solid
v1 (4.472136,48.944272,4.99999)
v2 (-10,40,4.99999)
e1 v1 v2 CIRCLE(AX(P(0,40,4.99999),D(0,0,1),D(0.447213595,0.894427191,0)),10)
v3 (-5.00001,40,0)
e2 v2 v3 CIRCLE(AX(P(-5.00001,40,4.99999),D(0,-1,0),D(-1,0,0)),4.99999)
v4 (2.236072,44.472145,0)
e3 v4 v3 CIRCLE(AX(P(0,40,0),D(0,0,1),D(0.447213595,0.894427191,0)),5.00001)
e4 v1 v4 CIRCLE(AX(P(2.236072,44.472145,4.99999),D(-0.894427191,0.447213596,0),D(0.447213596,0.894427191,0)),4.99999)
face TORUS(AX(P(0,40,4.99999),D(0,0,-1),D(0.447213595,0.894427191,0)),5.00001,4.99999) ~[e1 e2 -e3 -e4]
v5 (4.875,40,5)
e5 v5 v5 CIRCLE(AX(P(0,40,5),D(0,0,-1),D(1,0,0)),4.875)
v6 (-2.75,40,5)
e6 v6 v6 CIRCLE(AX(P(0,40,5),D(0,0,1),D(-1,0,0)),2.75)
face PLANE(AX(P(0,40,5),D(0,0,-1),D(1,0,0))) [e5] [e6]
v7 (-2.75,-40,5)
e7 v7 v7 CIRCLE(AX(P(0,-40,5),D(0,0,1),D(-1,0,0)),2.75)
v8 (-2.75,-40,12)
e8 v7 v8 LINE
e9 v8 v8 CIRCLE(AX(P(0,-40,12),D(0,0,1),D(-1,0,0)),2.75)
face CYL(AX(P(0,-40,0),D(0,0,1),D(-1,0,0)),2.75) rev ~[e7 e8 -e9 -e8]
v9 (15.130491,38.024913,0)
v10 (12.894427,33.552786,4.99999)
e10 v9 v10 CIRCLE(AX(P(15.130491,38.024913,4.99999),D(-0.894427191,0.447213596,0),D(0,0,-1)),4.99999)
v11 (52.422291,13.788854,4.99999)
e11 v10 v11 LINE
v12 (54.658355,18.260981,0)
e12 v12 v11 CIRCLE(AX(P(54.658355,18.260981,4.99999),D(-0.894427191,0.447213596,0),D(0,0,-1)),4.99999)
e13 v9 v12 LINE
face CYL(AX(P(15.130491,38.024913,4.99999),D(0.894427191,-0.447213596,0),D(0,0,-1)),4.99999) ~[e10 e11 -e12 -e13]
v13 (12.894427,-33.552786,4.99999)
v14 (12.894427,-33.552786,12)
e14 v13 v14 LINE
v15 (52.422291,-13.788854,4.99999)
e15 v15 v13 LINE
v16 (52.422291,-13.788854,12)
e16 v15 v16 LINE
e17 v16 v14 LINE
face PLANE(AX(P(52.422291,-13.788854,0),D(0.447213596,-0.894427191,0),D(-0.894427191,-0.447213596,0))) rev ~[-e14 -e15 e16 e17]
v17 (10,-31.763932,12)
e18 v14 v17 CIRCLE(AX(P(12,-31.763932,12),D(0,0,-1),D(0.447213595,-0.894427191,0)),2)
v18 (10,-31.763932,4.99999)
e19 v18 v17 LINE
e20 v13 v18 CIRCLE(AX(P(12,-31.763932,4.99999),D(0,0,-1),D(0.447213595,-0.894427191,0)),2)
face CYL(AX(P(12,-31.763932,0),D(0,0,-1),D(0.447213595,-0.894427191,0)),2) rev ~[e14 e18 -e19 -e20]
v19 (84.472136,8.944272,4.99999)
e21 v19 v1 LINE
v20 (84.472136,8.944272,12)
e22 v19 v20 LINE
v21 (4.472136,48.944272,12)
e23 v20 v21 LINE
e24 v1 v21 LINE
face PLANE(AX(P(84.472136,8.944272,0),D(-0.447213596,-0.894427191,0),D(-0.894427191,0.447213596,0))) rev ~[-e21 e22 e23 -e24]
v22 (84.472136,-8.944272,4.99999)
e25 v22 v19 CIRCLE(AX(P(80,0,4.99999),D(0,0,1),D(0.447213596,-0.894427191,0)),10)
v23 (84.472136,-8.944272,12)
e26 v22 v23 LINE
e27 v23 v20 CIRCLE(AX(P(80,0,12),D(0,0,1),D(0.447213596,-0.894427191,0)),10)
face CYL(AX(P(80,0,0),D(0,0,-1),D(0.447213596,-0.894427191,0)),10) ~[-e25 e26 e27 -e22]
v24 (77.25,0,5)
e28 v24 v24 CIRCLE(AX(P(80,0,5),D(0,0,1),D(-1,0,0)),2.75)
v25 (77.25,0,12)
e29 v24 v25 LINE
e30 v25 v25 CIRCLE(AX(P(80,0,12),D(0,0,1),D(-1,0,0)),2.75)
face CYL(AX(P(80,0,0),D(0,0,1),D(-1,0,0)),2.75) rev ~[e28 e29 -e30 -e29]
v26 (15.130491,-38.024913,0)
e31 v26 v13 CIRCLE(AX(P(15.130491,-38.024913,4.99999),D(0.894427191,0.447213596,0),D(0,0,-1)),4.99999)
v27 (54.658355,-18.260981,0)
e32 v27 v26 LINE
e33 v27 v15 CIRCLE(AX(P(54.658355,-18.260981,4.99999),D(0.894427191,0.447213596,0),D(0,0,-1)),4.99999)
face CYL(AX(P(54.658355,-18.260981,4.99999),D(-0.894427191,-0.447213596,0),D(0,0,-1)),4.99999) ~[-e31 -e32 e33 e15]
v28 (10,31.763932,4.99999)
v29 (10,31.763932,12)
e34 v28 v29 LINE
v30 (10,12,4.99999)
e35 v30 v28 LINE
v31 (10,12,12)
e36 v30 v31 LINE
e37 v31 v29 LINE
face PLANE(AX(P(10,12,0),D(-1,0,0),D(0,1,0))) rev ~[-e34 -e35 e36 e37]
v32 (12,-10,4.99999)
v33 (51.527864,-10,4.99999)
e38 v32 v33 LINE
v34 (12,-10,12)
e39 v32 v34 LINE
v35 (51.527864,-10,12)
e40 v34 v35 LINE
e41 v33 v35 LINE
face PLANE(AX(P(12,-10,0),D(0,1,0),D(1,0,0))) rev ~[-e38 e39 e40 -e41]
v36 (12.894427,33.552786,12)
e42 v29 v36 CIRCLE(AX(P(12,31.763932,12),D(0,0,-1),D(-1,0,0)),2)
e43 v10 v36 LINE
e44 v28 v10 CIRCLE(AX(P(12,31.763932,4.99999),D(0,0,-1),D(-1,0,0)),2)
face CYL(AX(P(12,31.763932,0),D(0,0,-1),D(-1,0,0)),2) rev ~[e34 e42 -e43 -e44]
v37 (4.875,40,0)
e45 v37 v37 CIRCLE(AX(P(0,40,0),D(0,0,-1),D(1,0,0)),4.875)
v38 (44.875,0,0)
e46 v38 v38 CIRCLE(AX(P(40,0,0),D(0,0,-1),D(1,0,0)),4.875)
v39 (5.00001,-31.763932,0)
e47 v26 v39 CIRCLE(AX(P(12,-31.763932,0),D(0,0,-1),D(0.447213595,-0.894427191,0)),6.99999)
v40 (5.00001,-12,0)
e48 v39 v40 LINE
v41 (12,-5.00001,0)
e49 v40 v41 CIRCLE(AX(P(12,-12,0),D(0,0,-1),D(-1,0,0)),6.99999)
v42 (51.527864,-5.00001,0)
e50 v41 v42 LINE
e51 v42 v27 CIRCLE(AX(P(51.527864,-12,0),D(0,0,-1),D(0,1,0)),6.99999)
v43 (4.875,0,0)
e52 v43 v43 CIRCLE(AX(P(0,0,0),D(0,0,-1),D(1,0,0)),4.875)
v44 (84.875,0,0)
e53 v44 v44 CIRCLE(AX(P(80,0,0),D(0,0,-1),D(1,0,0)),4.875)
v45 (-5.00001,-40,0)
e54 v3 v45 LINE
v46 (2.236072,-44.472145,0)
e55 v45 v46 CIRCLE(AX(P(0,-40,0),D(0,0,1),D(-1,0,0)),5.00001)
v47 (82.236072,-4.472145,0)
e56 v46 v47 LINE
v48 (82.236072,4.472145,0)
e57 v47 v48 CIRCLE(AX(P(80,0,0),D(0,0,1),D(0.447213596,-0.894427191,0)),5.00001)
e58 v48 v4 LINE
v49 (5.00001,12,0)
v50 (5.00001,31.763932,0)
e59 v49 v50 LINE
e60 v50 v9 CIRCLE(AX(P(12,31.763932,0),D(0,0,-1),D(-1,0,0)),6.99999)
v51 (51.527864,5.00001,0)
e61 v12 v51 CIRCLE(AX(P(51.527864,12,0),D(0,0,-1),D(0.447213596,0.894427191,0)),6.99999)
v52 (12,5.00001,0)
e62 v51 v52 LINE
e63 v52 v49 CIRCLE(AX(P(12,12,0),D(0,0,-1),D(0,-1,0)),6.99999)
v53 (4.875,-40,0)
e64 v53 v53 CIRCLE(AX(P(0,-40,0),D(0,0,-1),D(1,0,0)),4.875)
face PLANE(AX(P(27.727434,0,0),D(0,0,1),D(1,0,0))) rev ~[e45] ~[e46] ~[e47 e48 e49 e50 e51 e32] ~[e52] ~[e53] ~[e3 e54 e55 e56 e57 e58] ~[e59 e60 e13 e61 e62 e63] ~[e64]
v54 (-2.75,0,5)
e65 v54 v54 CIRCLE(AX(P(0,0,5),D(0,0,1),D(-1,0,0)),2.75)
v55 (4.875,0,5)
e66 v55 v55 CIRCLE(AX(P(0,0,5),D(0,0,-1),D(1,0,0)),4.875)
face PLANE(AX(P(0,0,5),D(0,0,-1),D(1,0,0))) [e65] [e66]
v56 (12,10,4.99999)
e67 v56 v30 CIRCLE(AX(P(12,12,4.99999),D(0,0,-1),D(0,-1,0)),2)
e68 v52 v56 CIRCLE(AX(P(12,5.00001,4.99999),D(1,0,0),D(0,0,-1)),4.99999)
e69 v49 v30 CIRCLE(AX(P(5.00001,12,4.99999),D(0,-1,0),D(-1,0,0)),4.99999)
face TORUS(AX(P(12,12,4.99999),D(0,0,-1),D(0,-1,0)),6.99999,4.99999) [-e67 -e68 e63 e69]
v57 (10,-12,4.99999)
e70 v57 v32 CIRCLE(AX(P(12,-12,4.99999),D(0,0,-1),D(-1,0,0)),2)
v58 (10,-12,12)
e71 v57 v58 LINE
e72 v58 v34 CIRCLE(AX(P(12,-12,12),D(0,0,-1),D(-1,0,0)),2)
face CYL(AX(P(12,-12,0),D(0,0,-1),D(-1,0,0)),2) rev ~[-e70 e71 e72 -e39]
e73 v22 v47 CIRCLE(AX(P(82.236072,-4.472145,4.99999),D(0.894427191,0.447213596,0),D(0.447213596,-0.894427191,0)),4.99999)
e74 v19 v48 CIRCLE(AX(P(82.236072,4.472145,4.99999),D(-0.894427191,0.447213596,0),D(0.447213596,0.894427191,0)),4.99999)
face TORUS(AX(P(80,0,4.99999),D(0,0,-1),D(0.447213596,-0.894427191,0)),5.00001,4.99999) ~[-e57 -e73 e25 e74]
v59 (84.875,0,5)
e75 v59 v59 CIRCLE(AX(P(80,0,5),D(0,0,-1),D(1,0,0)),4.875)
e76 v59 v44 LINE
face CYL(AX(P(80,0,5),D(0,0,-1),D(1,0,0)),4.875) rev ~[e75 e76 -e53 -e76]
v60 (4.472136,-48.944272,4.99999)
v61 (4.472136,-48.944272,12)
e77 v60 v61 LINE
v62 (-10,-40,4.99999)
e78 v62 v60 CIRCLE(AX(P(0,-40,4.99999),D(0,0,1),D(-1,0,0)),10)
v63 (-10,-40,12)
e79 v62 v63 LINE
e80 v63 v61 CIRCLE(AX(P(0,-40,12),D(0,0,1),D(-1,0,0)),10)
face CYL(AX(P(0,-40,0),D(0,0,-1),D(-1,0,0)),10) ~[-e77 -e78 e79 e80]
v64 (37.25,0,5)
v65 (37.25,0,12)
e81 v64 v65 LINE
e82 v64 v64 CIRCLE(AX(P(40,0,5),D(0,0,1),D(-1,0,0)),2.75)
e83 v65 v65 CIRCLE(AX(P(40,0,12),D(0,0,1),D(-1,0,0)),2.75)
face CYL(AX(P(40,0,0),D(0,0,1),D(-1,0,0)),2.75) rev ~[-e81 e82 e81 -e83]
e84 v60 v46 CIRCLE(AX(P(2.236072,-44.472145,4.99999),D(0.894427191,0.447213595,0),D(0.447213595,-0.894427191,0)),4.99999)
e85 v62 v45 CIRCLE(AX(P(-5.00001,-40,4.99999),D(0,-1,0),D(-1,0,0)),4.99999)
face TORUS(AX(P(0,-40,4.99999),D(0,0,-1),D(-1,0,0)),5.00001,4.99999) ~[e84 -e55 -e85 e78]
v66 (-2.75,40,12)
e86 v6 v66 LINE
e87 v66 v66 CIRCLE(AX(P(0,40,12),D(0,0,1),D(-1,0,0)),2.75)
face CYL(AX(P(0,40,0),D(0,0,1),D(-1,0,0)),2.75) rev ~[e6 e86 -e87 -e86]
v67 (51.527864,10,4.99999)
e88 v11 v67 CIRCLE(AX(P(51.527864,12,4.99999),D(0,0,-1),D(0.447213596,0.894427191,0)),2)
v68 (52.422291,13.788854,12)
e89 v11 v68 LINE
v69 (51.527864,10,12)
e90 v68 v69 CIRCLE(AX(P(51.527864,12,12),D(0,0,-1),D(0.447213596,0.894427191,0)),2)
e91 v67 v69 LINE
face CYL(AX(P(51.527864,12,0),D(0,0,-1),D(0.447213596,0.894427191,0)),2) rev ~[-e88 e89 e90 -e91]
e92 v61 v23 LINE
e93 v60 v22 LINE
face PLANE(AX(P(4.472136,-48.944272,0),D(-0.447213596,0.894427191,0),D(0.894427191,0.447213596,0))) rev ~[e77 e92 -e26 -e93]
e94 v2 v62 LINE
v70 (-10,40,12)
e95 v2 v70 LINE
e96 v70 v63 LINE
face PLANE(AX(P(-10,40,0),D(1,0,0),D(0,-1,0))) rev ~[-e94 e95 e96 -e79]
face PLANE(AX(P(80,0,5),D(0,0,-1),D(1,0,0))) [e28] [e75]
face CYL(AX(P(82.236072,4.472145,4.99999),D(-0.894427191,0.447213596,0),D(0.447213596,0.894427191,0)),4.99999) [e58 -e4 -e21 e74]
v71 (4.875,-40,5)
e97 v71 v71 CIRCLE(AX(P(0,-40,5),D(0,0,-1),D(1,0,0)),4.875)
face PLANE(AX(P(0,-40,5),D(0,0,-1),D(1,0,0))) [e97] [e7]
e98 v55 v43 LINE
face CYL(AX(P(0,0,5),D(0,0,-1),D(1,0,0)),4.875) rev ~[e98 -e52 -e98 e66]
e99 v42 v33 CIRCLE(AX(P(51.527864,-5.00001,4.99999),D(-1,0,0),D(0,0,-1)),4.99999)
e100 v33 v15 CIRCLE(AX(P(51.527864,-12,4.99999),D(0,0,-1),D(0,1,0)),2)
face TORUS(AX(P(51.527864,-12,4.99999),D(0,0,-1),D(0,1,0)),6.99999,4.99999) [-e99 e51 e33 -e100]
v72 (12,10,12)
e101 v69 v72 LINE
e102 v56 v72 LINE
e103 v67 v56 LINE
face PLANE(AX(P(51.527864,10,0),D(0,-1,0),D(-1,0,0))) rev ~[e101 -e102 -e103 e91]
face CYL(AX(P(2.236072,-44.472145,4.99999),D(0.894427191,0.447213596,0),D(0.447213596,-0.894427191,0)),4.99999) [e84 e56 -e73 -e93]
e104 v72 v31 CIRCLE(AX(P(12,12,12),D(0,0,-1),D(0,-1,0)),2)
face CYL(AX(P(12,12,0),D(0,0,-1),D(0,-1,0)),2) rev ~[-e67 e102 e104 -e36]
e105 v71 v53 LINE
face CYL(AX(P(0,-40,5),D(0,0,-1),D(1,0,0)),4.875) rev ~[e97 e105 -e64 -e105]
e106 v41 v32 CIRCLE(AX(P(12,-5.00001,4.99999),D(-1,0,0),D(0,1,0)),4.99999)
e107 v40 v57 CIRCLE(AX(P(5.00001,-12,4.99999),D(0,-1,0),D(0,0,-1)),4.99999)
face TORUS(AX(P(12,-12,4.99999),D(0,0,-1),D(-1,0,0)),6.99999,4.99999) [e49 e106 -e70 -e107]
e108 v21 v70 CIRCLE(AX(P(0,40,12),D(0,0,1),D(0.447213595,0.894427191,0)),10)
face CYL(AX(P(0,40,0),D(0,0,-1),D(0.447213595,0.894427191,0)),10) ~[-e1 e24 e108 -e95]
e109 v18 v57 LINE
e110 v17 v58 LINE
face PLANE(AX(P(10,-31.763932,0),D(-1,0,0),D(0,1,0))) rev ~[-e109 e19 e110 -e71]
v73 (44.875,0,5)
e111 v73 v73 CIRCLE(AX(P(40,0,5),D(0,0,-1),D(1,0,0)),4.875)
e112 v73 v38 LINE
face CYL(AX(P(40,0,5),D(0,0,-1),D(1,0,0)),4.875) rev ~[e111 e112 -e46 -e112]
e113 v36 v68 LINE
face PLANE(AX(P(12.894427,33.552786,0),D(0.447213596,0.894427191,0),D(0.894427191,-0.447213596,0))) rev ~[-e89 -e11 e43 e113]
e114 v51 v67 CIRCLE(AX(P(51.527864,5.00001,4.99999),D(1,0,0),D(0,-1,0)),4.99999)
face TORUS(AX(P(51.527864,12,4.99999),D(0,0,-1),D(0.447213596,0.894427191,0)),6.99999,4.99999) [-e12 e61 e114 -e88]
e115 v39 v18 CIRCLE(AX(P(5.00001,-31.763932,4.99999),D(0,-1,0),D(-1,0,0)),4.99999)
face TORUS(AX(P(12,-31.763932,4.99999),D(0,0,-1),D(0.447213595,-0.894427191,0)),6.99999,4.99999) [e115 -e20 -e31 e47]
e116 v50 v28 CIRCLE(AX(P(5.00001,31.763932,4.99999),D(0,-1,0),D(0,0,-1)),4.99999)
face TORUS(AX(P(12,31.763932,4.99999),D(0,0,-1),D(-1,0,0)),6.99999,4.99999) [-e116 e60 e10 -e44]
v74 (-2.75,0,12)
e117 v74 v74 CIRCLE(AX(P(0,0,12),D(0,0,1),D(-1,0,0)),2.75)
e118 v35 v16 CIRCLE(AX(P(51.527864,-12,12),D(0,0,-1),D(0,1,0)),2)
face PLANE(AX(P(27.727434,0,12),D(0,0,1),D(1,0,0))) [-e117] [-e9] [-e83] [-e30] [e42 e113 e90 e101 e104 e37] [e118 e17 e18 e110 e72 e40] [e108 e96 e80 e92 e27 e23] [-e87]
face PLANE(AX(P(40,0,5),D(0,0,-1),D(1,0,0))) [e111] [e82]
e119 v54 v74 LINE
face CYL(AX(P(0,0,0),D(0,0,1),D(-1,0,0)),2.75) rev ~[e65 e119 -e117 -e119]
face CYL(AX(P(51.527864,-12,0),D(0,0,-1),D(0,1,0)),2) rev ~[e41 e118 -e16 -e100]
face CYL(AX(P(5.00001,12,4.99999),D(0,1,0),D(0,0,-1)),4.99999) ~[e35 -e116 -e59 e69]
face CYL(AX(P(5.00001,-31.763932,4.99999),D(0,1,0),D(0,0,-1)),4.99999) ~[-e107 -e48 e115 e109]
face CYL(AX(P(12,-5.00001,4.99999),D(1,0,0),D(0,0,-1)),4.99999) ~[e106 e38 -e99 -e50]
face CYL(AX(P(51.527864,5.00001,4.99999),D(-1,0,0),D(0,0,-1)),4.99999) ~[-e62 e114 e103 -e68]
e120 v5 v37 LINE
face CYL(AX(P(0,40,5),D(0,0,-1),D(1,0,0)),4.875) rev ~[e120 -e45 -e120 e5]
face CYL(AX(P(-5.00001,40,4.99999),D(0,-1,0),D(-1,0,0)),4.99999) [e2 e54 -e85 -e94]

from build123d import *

# Parameters (mm, degrees)
F1_DEPTH       = 12
F2_D           = 5.5
F2_CBORE_D     = 9.75
F2_CBORE_DEPTH = 5
F3_R           = 4.99999


# Not quite as in the source:
# - a fillet or chamfer is up to 0.001 mm smaller than in the source, because OpenCascade refuses the exact size


with BuildPart() as f1:
    # F0 (on Top) → F1 (new body)
    with BuildSketch(Plane.XY):
        with BuildLine():
            Line((84.472135955, 8.94427191), (4.472135955, 48.94427191))
            ThreePointArc((4.472135955, 48.94427191), (-5.2573111212, 48.5065080835), (-10, 40))
            Line((-10, 40), (-10, -40))
            ThreePointArc((-10, -40), (-5.2573111212, -48.5065080835), (4.472135955, -48.94427191))
            Line((4.472135955, -48.94427191), (84.472135955, -8.94427191))
            ThreePointArc((84.472135955, -8.94427191), (90, 0), (84.472135955, 8.94427191))
        make_face()
        with BuildLine():
            Line((10, -31.7639320225), (10, -12))
            ThreePointArc((10, -12), (10.5857864376, -10.5857864376), (12, -10))
            Line((12, -10), (51.527864045, -10))
            ThreePointArc((51.527864045, -10), (53.4743620239, -11.5404941589), (52.422291236, -13.788854382))
            Line((52.422291236, -13.788854382), (12.894427191, -33.5527864045))
            ThreePointArc((12.894427191, -33.5527864045), (10.9485377758, -33.4652336392), (10, -31.7639320225))
        make_face(mode=Mode.SUBTRACT)
        with BuildLine():
            ThreePointArc((10, 31.7639320225), (10.9485377758, 33.4652336392), (12.894427191, 33.5527864045))
            Line((12.894427191, 33.5527864045), (52.422291236, 13.788854382))
            ThreePointArc((52.422291236, 13.788854382), (53.4743620239, 11.5404941589), (51.527864045, 10))
            Line((51.527864045, 10), (12, 10))
            ThreePointArc((12, 10), (10.5857864376, 10.5857864376), (10, 12))
            Line((10, 12), (10, 31.7639320225))
        make_face(mode=Mode.SUBTRACT)
    extrude(amount=F1_DEPTH)

    # F2 (through all)
    with Locations(Plane(origin=(0, 0, 0), x_dir=(1, 0, 0), z_dir=(0, 0, -1))):
        with Locations((0, -40), (0, 40), (0, 0), (40, 0), (80, 0)):
            CounterBoreHole(F2_D / 2, F2_CBORE_D / 2, F2_CBORE_DEPTH)

    # F3 (radius 5 in the source; OpenCascade refuses exactly that, so slightly less here)
    f3_edges = [f1.edges().sort_by_distance(p)[0] for p in [
        (44.472136, 28.944272, 0),
        (32.658359, 23.67082, 0),
        (32.658359, -23.67082, 0),
    ]]
    fillet(f3_edges, radius=F3_R)


solid = f1.part
